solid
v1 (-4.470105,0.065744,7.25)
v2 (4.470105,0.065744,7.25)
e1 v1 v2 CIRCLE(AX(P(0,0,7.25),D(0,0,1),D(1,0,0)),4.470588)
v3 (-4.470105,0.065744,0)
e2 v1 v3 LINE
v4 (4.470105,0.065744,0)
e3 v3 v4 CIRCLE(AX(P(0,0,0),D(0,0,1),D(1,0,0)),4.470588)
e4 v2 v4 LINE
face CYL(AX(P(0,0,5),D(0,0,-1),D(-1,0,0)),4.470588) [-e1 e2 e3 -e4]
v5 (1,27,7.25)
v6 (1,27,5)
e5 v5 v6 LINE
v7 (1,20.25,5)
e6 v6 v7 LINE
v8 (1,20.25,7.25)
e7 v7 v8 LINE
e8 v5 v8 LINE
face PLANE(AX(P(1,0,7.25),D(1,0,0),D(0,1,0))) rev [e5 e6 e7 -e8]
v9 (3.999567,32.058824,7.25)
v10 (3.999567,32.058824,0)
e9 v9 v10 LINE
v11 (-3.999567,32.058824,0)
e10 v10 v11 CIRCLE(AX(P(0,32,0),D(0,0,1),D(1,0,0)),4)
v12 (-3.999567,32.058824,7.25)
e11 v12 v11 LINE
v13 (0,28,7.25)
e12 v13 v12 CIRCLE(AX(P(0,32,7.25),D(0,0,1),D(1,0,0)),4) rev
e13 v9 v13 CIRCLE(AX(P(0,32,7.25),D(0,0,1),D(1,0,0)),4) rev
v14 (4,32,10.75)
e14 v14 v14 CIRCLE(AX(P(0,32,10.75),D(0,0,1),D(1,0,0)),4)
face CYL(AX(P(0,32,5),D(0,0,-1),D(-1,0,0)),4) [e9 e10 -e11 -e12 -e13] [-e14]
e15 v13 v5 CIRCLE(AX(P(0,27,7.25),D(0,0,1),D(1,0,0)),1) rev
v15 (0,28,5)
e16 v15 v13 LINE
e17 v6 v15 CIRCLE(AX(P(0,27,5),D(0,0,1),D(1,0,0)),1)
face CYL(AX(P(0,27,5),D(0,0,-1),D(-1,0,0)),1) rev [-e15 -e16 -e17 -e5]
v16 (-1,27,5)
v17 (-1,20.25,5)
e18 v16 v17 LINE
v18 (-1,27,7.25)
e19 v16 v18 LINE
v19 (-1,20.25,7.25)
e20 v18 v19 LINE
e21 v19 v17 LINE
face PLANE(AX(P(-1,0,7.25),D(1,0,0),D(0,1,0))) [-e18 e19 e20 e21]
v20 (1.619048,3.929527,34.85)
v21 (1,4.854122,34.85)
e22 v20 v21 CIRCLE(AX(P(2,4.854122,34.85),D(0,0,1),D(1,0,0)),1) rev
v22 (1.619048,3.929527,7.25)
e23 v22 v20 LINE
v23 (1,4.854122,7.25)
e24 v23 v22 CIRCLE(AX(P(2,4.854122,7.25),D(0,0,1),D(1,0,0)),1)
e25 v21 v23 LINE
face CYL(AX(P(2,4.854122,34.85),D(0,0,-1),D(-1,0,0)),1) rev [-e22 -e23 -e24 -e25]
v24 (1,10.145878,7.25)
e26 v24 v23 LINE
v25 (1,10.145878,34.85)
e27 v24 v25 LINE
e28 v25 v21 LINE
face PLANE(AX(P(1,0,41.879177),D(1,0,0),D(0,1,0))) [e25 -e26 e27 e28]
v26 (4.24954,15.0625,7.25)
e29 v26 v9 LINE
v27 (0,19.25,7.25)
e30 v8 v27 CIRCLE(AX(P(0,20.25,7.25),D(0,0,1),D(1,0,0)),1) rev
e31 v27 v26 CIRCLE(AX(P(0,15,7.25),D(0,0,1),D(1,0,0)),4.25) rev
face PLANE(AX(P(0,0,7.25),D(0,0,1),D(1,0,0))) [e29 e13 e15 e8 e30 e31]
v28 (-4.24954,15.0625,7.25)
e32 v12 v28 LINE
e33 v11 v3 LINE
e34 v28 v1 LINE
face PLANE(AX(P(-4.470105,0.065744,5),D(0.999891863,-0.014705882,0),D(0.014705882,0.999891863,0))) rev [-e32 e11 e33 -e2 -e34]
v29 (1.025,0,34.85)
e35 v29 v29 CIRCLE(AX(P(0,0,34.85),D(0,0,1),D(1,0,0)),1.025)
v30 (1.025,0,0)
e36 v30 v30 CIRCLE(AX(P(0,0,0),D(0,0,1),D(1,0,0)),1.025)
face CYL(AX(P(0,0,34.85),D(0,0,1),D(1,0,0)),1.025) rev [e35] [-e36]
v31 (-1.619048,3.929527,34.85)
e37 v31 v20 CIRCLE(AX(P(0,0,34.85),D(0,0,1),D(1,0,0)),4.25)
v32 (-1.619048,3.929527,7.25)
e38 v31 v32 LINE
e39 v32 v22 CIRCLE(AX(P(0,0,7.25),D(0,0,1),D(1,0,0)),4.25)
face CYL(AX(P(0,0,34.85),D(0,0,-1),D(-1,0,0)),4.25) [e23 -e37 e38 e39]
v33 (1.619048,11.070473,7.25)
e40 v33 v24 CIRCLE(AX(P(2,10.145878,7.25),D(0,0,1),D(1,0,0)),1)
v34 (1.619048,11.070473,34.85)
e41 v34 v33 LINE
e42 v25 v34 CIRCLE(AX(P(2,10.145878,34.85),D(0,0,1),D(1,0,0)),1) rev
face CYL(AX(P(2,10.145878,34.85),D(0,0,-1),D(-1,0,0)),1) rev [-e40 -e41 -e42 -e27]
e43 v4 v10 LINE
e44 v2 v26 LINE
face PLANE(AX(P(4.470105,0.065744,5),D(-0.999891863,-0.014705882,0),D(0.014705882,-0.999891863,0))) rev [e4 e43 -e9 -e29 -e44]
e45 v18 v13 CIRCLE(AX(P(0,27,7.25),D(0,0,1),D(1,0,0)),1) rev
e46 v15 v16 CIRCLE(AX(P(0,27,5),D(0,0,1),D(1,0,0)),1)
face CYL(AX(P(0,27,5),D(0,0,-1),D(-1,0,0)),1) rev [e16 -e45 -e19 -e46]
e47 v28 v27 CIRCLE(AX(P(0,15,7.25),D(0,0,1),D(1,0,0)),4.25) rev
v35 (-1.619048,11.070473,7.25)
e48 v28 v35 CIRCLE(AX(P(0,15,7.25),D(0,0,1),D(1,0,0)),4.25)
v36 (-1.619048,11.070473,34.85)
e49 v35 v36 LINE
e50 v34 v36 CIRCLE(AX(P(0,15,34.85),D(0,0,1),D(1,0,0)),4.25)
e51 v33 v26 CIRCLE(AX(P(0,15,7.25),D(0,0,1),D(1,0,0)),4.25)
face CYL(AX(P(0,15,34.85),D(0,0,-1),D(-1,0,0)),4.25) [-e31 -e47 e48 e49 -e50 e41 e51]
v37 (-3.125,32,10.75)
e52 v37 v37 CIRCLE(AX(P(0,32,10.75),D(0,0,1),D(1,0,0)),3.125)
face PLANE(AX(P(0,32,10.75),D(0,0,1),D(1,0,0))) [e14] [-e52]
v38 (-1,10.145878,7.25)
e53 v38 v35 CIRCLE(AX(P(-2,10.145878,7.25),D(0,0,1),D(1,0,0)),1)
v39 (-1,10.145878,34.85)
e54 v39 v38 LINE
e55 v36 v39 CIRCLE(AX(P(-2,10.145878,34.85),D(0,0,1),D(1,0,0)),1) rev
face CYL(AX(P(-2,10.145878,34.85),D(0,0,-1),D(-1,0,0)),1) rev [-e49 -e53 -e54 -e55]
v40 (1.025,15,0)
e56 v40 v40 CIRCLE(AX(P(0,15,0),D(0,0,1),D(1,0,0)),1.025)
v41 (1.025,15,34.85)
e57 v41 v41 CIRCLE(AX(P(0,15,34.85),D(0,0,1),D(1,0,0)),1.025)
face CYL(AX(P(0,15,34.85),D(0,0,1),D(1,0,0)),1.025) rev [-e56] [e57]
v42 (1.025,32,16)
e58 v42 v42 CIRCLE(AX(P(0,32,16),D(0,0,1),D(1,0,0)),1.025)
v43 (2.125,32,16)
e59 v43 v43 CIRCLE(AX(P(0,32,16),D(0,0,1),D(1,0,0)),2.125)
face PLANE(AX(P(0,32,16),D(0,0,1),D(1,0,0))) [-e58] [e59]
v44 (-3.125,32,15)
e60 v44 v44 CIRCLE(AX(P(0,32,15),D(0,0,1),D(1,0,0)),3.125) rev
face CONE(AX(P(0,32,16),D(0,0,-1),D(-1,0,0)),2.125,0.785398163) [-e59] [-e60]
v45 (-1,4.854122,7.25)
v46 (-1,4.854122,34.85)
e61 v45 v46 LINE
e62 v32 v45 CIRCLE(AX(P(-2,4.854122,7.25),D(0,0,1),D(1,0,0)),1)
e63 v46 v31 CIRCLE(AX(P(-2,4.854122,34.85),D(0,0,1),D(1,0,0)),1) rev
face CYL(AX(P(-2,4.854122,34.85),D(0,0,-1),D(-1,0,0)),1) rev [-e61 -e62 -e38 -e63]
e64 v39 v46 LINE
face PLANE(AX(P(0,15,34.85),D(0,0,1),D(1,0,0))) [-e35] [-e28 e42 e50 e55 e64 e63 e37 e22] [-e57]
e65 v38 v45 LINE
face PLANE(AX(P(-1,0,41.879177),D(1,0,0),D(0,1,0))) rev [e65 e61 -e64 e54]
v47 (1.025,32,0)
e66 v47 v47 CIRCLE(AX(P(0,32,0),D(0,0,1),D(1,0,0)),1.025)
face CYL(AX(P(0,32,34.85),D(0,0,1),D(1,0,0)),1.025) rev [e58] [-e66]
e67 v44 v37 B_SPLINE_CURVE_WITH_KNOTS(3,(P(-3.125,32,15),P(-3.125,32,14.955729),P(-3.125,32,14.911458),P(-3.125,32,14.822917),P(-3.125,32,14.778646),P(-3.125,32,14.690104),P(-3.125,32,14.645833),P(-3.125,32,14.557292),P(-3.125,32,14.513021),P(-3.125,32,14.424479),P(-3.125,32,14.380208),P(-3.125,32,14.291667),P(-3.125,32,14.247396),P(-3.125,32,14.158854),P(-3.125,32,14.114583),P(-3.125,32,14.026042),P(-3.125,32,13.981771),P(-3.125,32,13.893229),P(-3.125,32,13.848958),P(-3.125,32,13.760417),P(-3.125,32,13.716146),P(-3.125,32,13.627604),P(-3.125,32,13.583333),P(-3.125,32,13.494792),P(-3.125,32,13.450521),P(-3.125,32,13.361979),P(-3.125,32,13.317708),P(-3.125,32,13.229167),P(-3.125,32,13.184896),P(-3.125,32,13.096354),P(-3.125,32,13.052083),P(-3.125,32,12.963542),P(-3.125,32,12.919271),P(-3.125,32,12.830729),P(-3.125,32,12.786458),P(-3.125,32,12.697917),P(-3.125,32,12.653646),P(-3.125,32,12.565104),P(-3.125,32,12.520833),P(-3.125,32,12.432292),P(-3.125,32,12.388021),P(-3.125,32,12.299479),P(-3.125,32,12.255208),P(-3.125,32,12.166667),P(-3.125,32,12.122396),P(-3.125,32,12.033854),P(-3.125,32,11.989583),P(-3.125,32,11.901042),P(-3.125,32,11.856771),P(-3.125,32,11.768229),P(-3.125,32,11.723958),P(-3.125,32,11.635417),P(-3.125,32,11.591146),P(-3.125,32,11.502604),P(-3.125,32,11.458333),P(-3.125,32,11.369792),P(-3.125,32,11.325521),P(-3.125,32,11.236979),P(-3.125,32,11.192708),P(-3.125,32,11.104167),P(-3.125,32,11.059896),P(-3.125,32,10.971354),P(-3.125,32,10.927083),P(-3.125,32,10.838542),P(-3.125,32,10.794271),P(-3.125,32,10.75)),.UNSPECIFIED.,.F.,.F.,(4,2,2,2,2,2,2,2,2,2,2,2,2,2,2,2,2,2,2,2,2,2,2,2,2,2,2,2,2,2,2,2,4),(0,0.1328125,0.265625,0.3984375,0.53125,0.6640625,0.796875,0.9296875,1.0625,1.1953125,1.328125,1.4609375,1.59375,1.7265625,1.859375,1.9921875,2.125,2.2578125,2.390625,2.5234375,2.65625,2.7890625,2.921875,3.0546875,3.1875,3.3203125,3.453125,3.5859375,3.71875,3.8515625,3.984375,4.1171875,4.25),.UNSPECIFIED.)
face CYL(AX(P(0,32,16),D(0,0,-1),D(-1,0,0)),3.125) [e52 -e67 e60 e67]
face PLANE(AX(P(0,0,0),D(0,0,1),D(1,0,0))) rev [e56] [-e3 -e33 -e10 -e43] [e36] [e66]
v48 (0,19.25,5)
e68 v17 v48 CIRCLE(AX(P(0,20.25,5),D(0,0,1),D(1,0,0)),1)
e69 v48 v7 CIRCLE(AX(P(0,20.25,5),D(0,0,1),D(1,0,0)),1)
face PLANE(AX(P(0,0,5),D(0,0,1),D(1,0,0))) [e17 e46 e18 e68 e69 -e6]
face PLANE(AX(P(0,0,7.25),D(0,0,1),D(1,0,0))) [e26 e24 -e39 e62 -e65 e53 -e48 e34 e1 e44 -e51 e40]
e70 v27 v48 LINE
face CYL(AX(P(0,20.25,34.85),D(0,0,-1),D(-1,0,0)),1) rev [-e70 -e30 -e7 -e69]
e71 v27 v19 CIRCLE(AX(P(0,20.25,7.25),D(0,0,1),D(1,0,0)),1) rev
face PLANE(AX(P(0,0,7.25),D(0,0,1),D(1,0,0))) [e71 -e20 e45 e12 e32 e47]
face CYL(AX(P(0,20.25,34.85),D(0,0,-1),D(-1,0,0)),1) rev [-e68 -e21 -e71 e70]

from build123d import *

# Parameters (mm, degrees)
BOSS_EXTRUDE1_DEPTH      = 5
BOSS_EXTRUDE3_START      = 5
SKETCH1_5_R              = 4
BOSS_EXTRUDE3_DEPTH      = 5.75
BOSS_EXTRUDE2_START      = 10.75
SKETCH1_4_R              = 3.125
BOSS_EXTRUDE2_DEPTH      = 5.25
BOSS_EXTRUDE4_START      = 5
SKETCH1_6_R              = 4.25
BOSS_EXTRUDE4_DEPTH      = 29.85
BOSS_EXTRUDE5_DEPTH      = 2.25
BOSS_EXTRUDE6_DEPTH      = 29.85
FILLET1_R                = 1
M2_5X0_45_TAPPED_HOLE1_D = 2.05
CHAMFER1_SIZE            = 1


# Read off the part's stored shape, not the designer's step: Boss-Extrude5
with BuildPart() as part:
    # Sketch1 → Boss-Extrude1 (new body)
    with BuildSketch(Plane.XY):
        with BuildLine():
            ThreePointArc((3.999567451, 32.058823529), (0, 36), (-3.999567451, 32.058823529))
            Line((-3.999567451, 32.058823529), (-4.470104798, 0.065743945))
            ThreePointArc((-4.470104798, 0.065743945), (0, -4.470588235), (4.470104798, 0.065743945))
            Line((4.470104798, 0.065743945), (3.999567451, 32.058823529))
        make_face()
    extrude(amount=BOSS_EXTRUDE1_DEPTH)

    # Sketch1<5> → Boss-Extrude3 (add)
    with BuildSketch(Plane.XY.offset(BOSS_EXTRUDE3_START)):
        with Locations(Location((0, 32, 0), (0, 0, 179.157384634))):
            Circle(SKETCH1_5_R)
    extrude(amount=BOSS_EXTRUDE3_DEPTH)

    # Sketch1<4> → Boss-Extrude2 (add)
    with BuildSketch(Plane.XY.offset(BOSS_EXTRUDE2_START)):
        with Locations(Location((0, 32, 0), (0, 0, 180))):
            Circle(SKETCH1_4_R)
    extrude(amount=BOSS_EXTRUDE2_DEPTH)

    # Sketch1<6> → Boss-Extrude4 (add)
    with BuildSketch(Plane.XY.offset(BOSS_EXTRUDE4_START)):
        Circle(SKETCH1_6_R)
        with Locations(Location((0, 15, 0), (0, 0, 179.157384634))):
            Circle(SKETCH1_6_R)
    extrude(amount=BOSS_EXTRUDE4_DEPTH)

    # Boss-Extrude5 outline → Boss-Extrude5 (add)
    with BuildSketch(Plane.XY.offset(5)):
        with BuildLine():
            Line((-4.249540417, 15.06249996), (-4.470104798, 0.065743945))
            ThreePointArc((-4.470104798, 0.065743945), (0, -4.470588235), (4.470104798, 0.065743945))
            Line((4.470104798, 0.065743945), (4.249540416, 15.062500001))
            ThreePointArc((4.249540416, 15.062500001), (3.35933087, 12.396656745), (1, 10.86932209))
            Line((1, 10.86932209), (1, 4.13067791))
            ThreePointArc((1, 4.13067791), (0, -4.25), (-1, 4.13067791))
            Line((-1, 4.13067791), (-1, 10.86932209))
            ThreePointArc((-1, 10.86932209), (-3.359330858, 12.396656729), (-4.249540417, 15.06249996))
        make_face()
        with BuildLine():
            Line((-3.999567451, 32.058823529), (-4.249540417, 15.06249996))
            ThreePointArc((-4.249540417, 15.06249996), (-3.320683154, 17.652463646), (-1, 19.13067791))
            Line((-1, 19.13067791), (-1, 28.127016654))
            ThreePointArc((-1, 28.127016654), (-3.18020361, 29.573829149), (-3.999567451, 32.058823529))
        make_face()
        with BuildLine():
            ThreePointArc((1, 19.13067791), (3.320683141, 17.652463662), (4.249540416, 15.062500001))
            Line((4.249540416, 15.062500001), (3.999567451, 32.058823529))
            ThreePointArc((3.999567451, 32.058823529), (3.18020361, 29.573829149), (1, 28.127016654))
            Line((1, 28.127016654), (1, 19.13067791))
        make_face()
    extrude(amount=BOSS_EXTRUDE5_DEPTH)

    # Sketch2<3> → Boss-Extrude6 (add)
    with BuildSketch(Plane.XY.offset(5)):
        with BuildLine():
            ThreePointArc((1, 10.86932209), (0, 10.75), (-1, 10.86932209))
            Line((-1, 10.86932209), (-1, 4.13067791))
            ThreePointArc((-1, 4.13067791), (0, 4.25), (1, 4.13067791))
            Line((1, 4.13067791), (1, 10.86932209))
        make_face()
    extrude(amount=BOSS_EXTRUDE6_DEPTH)

    # Fillet1
    fillet1_edges = [part.edges().sort_by_distance(p)[0] for p in [
        (1, 4.13067791, 21.05),
        (1, 10.86932209, 21.05),
        (-1, 4.13067791, 21.05),
        (-1, 10.86932209, 21.05),
        (-1, 28.127016654, 6.125),
        (1, 28.127016654, 6.125),
        (-1, 19.13067791, 6.125),
        (1, 19.13067791, 6.125),
    ]]
    fillet(fillet1_edges, radius=FILLET1_R - 0.0001)  # a hair under: the kernel refuses the full size

    # M2.5x0.45 Tapped Hole1 (through all)
    with Locations(Plane.XY.offset(34.85)):
        with Locations((0, 15), (0, 0), (0, 32)):
            Hole(M2_5X0_45_TAPPED_HOLE1_D / 2)

    # Chamfer1
    chamfer1_edges = [part.edges().sort_by_distance(p)[0] for p in [
        (3.125, 32, 16),
    ]]
    chamfer(chamfer1_edges, length=CHAMFER1_SIZE)


solid = part.part
